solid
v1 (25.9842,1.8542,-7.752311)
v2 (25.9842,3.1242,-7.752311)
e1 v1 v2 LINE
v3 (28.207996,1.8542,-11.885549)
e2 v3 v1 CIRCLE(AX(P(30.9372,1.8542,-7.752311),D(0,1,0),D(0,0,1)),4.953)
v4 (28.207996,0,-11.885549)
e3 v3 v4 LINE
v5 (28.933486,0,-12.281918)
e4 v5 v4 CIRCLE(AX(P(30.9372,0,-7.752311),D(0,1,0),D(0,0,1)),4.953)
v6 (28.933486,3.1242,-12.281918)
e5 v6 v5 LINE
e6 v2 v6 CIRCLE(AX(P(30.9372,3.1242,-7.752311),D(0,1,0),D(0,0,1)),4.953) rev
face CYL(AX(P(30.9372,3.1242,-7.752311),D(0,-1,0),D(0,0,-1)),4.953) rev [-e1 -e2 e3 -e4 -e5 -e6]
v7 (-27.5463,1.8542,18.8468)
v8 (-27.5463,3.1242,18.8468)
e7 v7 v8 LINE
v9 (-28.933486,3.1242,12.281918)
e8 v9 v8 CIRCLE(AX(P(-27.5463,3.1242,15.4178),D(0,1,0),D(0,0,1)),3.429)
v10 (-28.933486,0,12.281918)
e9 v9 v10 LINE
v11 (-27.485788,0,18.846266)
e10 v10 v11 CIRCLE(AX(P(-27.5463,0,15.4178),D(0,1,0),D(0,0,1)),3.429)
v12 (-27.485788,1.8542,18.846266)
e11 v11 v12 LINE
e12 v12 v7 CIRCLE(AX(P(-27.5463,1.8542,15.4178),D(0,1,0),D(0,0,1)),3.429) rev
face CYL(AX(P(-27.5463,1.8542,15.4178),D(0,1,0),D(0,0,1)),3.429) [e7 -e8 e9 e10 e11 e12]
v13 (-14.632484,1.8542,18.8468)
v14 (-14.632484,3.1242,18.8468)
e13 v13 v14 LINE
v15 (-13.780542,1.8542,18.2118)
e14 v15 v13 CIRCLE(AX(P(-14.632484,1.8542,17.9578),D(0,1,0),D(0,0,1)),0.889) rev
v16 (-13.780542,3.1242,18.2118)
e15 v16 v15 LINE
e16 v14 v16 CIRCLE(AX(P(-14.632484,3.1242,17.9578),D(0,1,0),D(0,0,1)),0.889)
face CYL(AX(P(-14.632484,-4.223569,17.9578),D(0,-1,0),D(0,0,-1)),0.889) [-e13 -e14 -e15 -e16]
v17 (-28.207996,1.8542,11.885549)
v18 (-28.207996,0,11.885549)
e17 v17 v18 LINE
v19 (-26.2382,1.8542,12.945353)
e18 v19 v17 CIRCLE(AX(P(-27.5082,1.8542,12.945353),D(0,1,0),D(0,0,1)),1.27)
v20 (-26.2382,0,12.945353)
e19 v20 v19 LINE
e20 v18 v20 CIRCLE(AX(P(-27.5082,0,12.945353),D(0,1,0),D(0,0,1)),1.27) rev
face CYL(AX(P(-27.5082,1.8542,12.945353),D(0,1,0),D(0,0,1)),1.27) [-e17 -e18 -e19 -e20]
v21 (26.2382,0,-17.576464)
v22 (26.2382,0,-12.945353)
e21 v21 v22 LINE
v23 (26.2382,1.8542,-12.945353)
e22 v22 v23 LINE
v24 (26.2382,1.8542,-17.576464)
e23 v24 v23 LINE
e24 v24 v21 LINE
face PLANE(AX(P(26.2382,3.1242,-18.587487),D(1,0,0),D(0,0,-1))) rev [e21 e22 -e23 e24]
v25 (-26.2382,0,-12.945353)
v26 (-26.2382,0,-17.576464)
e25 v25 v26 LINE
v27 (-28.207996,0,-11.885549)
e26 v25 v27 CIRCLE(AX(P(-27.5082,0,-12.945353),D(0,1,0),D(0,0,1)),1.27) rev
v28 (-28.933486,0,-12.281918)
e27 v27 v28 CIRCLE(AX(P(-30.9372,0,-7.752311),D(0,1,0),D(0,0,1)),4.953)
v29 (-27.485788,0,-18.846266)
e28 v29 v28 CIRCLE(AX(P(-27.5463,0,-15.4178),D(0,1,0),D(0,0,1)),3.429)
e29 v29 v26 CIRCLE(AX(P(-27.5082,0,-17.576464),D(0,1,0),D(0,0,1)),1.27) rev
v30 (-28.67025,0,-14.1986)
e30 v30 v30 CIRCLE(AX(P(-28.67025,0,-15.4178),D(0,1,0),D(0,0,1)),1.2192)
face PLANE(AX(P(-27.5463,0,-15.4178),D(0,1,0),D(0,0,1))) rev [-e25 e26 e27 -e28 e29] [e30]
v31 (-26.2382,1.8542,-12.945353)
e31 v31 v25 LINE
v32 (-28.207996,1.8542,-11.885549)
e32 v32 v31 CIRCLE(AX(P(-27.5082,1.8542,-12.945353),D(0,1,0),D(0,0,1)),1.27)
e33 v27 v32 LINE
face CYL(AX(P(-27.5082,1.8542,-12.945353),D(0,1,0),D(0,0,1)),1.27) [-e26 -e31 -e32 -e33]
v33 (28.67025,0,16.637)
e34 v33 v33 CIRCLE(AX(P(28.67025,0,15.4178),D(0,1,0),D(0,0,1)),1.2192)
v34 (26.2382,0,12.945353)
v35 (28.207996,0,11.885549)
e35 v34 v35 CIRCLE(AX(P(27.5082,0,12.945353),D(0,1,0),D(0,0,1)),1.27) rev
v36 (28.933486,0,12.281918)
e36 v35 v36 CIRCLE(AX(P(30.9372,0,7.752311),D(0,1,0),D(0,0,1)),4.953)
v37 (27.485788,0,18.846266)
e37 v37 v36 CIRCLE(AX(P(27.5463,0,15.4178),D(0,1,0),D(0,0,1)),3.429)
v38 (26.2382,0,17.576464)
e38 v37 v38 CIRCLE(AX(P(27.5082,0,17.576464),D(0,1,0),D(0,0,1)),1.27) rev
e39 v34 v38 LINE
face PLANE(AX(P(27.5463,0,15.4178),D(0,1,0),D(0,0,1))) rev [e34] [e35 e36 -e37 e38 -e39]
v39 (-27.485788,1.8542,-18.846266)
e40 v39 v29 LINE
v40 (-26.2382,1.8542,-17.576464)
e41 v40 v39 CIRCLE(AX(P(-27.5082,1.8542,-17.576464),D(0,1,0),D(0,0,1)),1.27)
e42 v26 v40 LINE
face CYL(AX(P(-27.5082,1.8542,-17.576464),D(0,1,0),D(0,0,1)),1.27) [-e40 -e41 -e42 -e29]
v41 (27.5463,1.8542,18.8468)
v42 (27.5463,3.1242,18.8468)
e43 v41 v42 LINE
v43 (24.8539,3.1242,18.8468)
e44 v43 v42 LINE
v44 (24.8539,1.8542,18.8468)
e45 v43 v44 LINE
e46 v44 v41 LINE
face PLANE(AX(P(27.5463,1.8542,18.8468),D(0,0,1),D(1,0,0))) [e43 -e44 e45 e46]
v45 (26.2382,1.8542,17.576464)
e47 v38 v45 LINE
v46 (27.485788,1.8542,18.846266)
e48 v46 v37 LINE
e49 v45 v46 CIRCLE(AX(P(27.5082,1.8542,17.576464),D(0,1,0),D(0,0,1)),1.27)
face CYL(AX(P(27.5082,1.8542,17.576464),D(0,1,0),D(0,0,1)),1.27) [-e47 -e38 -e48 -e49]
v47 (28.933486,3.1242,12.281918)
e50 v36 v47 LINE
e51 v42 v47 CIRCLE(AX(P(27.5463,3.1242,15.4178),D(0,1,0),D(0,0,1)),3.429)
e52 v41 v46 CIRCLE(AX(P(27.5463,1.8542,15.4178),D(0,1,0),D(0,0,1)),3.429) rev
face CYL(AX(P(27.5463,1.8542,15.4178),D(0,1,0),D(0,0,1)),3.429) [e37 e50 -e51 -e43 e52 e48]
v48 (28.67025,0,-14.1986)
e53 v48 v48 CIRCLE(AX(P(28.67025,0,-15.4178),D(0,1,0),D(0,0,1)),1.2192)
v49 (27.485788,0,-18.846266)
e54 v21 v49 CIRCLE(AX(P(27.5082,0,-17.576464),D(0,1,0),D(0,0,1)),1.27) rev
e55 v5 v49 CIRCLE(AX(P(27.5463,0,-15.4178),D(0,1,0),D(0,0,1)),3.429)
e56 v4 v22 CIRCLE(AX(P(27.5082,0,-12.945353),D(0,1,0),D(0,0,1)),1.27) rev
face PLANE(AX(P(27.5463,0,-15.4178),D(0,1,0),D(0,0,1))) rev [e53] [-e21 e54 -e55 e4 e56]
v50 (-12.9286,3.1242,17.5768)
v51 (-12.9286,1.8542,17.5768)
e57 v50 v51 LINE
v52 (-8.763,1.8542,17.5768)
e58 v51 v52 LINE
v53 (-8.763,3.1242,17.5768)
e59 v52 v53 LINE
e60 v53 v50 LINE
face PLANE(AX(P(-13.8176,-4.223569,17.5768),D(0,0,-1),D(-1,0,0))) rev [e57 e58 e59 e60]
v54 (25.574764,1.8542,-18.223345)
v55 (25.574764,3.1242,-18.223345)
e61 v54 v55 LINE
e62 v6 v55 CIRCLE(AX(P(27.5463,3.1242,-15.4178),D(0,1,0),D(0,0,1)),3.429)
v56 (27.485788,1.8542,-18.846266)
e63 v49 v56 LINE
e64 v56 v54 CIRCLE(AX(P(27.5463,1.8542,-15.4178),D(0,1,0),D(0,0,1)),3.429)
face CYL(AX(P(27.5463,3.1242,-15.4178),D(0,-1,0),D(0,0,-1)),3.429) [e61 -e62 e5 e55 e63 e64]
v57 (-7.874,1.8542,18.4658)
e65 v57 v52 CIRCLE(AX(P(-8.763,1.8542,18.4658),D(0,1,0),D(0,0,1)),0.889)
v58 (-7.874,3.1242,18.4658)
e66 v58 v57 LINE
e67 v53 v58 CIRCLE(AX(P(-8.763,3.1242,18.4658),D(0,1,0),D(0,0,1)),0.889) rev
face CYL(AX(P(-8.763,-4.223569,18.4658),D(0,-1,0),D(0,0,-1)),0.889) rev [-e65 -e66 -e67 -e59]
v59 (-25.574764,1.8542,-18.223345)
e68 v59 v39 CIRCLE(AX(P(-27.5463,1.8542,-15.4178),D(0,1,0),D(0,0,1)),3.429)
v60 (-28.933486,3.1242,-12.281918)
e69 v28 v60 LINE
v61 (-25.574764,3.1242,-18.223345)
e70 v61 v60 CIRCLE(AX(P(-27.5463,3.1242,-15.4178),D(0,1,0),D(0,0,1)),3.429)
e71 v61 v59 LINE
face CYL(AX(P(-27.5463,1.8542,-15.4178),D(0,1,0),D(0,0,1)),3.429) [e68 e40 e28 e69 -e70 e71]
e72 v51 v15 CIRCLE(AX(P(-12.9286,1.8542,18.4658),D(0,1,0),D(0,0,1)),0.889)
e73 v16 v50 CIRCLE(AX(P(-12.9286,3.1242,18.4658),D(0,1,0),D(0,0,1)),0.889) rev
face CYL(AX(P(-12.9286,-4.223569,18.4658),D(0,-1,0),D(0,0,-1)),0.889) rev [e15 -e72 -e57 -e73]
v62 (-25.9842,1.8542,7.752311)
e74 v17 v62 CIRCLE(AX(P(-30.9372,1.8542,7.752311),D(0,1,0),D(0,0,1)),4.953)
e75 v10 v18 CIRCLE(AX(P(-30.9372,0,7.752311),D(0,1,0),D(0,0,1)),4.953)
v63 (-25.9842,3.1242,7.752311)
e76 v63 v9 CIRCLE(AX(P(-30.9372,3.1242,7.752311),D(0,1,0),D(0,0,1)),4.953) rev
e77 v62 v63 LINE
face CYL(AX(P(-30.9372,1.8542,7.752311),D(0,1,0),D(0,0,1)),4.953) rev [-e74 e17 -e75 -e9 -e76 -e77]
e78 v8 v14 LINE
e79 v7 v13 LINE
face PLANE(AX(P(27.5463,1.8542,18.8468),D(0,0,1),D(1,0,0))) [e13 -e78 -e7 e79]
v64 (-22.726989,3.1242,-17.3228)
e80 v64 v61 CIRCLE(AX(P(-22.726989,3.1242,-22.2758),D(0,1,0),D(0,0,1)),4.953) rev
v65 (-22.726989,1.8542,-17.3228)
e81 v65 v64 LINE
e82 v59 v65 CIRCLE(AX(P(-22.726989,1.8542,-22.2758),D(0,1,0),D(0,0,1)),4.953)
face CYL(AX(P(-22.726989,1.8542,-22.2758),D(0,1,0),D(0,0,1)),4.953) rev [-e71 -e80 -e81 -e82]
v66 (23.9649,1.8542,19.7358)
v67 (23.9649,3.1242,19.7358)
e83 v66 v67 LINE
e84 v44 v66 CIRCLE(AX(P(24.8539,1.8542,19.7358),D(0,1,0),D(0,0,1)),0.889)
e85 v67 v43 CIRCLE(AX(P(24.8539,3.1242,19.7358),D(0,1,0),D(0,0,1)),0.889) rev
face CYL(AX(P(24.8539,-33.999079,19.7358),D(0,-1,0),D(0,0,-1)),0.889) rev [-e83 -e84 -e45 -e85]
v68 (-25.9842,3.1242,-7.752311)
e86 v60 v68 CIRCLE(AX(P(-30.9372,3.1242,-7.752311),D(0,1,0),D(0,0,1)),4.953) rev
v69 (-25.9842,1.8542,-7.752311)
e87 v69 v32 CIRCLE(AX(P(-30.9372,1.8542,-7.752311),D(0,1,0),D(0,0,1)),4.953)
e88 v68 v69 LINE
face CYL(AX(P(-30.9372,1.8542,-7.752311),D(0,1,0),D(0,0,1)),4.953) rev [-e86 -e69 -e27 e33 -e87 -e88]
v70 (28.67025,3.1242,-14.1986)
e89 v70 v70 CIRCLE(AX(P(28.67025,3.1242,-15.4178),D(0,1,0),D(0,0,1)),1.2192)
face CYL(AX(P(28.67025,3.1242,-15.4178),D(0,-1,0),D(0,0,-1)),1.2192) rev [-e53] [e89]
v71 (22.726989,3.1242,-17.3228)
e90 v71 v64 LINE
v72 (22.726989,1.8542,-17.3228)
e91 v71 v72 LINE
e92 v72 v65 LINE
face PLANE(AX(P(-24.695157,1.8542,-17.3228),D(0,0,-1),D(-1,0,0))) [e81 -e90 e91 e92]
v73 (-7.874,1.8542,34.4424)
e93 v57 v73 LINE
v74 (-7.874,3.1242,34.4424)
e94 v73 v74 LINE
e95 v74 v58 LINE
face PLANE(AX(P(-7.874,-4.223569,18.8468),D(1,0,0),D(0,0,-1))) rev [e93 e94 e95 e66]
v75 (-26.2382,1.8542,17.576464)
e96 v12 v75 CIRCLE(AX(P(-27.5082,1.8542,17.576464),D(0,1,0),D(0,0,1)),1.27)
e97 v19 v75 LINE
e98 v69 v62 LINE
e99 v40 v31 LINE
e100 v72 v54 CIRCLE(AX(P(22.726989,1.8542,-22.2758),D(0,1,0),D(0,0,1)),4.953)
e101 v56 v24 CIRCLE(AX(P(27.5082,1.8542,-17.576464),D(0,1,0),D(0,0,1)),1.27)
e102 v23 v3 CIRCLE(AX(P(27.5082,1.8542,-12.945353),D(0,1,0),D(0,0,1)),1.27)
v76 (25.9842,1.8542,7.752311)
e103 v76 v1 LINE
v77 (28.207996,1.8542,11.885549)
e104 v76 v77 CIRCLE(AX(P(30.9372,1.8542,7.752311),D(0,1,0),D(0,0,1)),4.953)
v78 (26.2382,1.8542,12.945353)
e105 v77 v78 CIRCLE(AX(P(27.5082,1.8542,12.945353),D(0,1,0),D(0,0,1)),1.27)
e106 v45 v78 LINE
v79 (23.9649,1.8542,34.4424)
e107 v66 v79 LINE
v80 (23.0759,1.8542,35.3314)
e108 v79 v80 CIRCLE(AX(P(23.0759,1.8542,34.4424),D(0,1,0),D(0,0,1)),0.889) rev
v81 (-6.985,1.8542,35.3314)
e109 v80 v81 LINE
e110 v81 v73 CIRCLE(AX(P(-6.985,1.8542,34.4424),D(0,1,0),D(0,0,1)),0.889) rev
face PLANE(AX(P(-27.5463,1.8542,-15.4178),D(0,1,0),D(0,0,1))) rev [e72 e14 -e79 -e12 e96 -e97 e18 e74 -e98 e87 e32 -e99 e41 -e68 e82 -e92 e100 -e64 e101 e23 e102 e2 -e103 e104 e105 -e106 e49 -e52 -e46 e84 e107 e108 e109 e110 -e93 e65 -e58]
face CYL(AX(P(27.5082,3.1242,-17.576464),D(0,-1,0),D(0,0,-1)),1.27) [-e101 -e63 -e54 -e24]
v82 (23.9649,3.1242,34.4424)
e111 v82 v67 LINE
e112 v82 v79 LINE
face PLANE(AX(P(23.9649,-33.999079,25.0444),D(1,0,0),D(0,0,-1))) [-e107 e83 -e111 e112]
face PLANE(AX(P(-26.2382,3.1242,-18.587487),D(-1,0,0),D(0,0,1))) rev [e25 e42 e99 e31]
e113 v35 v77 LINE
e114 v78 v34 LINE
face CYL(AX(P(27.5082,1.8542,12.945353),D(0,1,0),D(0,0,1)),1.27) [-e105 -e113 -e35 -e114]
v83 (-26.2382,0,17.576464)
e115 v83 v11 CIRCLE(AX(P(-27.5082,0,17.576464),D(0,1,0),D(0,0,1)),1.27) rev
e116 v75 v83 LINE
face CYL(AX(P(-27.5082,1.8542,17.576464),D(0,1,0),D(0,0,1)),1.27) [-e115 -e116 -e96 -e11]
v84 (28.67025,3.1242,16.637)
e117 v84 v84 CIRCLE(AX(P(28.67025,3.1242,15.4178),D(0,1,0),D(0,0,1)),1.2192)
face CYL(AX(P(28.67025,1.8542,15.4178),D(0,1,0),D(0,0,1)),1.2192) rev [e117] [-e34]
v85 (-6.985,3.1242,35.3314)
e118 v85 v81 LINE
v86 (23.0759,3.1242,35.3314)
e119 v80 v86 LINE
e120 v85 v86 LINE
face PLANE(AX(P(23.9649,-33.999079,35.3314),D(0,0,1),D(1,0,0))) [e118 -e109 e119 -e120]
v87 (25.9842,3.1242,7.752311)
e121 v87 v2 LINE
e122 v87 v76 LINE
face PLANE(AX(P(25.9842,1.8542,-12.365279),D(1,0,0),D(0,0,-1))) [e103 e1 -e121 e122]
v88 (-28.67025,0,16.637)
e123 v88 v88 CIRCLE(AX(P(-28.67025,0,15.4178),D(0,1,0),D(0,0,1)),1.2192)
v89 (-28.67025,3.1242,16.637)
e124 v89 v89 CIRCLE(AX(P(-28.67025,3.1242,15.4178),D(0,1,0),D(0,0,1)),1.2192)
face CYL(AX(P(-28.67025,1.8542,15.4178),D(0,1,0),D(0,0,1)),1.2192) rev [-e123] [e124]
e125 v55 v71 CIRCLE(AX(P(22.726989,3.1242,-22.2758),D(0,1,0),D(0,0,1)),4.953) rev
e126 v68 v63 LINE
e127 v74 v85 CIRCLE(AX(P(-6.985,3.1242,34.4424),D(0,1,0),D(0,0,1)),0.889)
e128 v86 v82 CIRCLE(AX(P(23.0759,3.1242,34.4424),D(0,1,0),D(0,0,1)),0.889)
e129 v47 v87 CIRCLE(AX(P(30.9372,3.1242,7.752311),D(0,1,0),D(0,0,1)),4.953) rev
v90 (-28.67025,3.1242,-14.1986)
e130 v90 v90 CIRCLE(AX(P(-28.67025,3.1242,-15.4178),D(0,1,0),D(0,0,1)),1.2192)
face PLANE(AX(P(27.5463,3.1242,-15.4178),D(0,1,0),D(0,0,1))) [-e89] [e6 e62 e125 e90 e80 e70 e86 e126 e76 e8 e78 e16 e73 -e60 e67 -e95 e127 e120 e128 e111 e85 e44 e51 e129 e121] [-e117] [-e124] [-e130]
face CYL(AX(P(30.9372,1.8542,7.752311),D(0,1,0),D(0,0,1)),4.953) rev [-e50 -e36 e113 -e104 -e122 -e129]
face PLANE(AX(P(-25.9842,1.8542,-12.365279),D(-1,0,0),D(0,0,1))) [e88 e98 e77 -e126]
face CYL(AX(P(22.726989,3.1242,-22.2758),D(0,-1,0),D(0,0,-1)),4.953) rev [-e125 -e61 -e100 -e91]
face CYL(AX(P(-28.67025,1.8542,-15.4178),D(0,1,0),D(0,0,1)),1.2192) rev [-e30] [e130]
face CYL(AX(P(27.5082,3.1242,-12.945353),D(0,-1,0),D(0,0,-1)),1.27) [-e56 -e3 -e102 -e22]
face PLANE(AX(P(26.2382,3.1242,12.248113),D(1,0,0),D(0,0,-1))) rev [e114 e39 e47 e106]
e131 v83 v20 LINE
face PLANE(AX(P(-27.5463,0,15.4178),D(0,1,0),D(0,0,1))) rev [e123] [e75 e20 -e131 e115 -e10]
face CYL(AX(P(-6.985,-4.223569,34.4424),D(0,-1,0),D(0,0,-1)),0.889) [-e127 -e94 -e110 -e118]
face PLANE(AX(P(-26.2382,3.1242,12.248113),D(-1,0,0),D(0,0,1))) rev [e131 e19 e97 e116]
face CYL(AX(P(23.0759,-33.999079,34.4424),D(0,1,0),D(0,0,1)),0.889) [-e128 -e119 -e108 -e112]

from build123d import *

# Parameters (mm, degrees)
SKETCH1_R             = 1.2192
BOSS_EXTRUDE1_DEPTH   = 3.1242
BOSS_EXTRUDE1_2_DEPTH = 3.1242
BOSS_EXTRUDE1_3_DEPTH = 3.1242
BOSS_EXTRUDE1_4_DEPTH = 3.1242
BOSS_EXTRUDE2_START   = -1.27
SKETCH2_R             = 1.2192
BOSS_EXTRUDE2_DEPTH   = 1.27
SKETCH4_W             = 5.9436
SKETCH4_H             = 1.27
CUT_EXTRUDE1_DEPTH    = 1.27
FILLET1_DEPTH         = 3.1242
FILLET1_START         = 1.8542
FILLET1_2_DEPTH       = 1.27
BOSS_EXTRUDE3_DEPTH   = 1.27
FILLET2_R             = 0.889
FILLET3_R             = 0.889
FILLET5_R             = 1.27


with BuildPart() as part:
    # Sketch1 → Boss-Extrude1 (new body)
    with BuildSketch(Plane(origin=(0, 0, 0), x_dir=(1, 0, 0), z_dir=(0, 1, 0))):
        with BuildLine():
            Line((26.2382, 18.587486955), (26.2382, 12.248113045))
            ThreePointArc((26.2382, 12.248113045), (30.9753, 15.4178), (26.2382, 18.587486955))
        make_face()
        with Locations(Location((28.67025, 15.4178, 0), (0, 0, 270))):
            Circle(SKETCH1_R, mode=Mode.SUBTRACT)
    extrude(amount=BOSS_EXTRUDE1_DEPTH)



with BuildPart() as body_2:
    # Sketch1 → Boss-Extrude1 2 (new body)
    with BuildSketch(Plane(origin=(0, 0, 0), x_dir=(1, 0, 0), z_dir=(0, 1, 0))):
        with BuildLine():
            Line((-26.2382, 18.587486955), (-26.2382, 12.248113045))
            ThreePointArc((-26.2382, 12.248113045), (-30.9753, 15.4178), (-26.2382, 18.587486955))
        make_face()
        with Locations(Location((-28.67025, 15.4178, 0), (0, 0, 270))):
            Circle(SKETCH1_R, mode=Mode.SUBTRACT)
    extrude(amount=BOSS_EXTRUDE1_2_DEPTH)


with BuildPart() as body_3:
    # Sketch1 → Boss-Extrude1 3 (new body)
    with BuildSketch(Plane(origin=(0, 0, 0), x_dir=(1, 0, 0), z_dir=(0, 1, 0))):
        with BuildLine():
            Line((26.2382, -12.248113045), (26.2382, -18.587486955))
            ThreePointArc((26.2382, -18.587486955), (30.9753, -15.4178), (26.2382, -12.248113045))
        make_face()
        with Locations(Location((28.67025, -15.4178, 0), (0, 0, 270))):
            Circle(SKETCH1_R, mode=Mode.SUBTRACT)
    extrude(amount=BOSS_EXTRUDE1_3_DEPTH)


with BuildPart() as body_4:
    # Sketch1 → Boss-Extrude1 4 (new body)
    with BuildSketch(Plane(origin=(0, 0, 0), x_dir=(1, 0, 0), z_dir=(0, 1, 0))):
        with BuildLine():
            Line((-26.2382, -12.248113045), (-26.2382, -18.587486955))
            ThreePointArc((-26.2382, -18.587486955), (-30.9753, -15.4178), (-26.2382, -12.248113045))
        make_face()
        with Locations(Location((-28.67025, -15.4178, 0), (0, 0, 270))):
            Circle(SKETCH1_R, mode=Mode.SUBTRACT)
    extrude(amount=BOSS_EXTRUDE1_4_DEPTH)


with BuildPart() as part_1:
    add(part.part)

    add(body_2.part)  # Boss-Extrude2 merges body 2

    add(body_3.part)  # Boss-Extrude2 merges body 3

    add(body_4.part)  # Boss-Extrude2 merges body 4
    # Sketch2 → Boss-Extrude2 (add)
    with BuildSketch(Plane(origin=(0, 3.1242, 0), x_dir=(1, 0, 0), z_dir=(0, 1, 0)).offset(BOSS_EXTRUDE2_START)):
        with BuildLine():
            Line((-24.695157071, 17.3228), (24.695157071, 17.3228))
            ThreePointArc((24.695157071, 17.3228), (30.864949116, 16.280707319), (25.9842, 12.365278978))
            Line((25.9842, 12.365278978), (25.9842, -12.365278978))
            ThreePointArc((25.9842, -12.365278978), (30.879851828, -14.614386528), (27.5463, -18.8468))
            Line((27.5463, -18.8468), (-27.5463, -18.8468))
            ThreePointArc((-27.5463, -18.8468), (-30.879851828, -14.614386528), (-25.9842, -12.365278978))
            Line((-25.9842, -12.365278978), (-25.9842, 12.365278978))
            ThreePointArc((-25.9842, 12.365278978), (-30.864949116, 16.280707319), (-24.695157071, 17.3228))
        make_face()
        with Locations(Location((28.67025, -15.4178, 0), (0, 0, 270))):
            Circle(SKETCH2_R, mode=Mode.SUBTRACT)
        with Locations(Location((28.67025, 15.4178, 0), (0, 0, 270))):
            Circle(SKETCH2_R, mode=Mode.SUBTRACT)
        with Locations(Location((-28.67025, 15.4178, 0), (0, 0, 270))):
            Circle(SKETCH2_R, mode=Mode.SUBTRACT)
        with Locations(Location((-28.67025, -15.4178, 0), (0, 0, 270))):
            Circle(SKETCH2_R, mode=Mode.SUBTRACT)
    extrude(amount=BOSS_EXTRUDE2_DEPTH)

    # Sketch4 → Cut-Extrude1 (cut)
    with BuildSketch(Plane(origin=(0, 3.1242, 0), x_dir=(1, 0, 0), z_dir=(0, 1, 0))):
        with Locations((-10.8458, -18.2118)):
            Rectangle(SKETCH4_W, SKETCH4_H)
    extrude(amount=-CUT_EXTRUDE1_DEPTH, mode=Mode.SUBTRACT)

    # Fillet1: read off the stored shape, not the designer's step
    # Fillet1 outline → Fillet1 (add)
    with BuildSketch(Plane(origin=(0, 0, 0), x_dir=(1, 0, 0), z_dir=(0, 1, 0))):
        with BuildLine():
            Line((26.2382, 12.248113045), (26.2382, 9.318072184))
            ThreePointArc((26.2382, 9.318072184), (27.272818982, 11.08465566), (28.933486364, 12.281918148))
            ThreePointArc((28.933486364, 12.281918148), (27.58930418, 11.989069675), (26.2382, 12.248113045))
        make_face()
        with BuildLine():
            ThreePointArc((28.933486364, -12.281918148), (27.272818982, -11.08465566), (26.2382, -9.318072184))
            Line((26.2382, -9.318072184), (26.2382, -12.248113045))
            ThreePointArc((26.2382, -12.248113045), (27.58930418, -11.989069675), (28.933486364, -12.281918148))
        make_face()
        with BuildLine():
            Line((-26.2382, 9.318072184), (-26.2382, 12.248113045))
            ThreePointArc((-26.2382, 12.248113045), (-27.58930418, 11.989069675), (-28.933486364, 12.281918148))
            ThreePointArc((-28.933486364, 12.281918148), (-27.272818982, 11.08465566), (-26.2382, 9.318072184))
        make_face()
        with BuildLine():
            Line((-26.2382, -12.248113045), (-26.2382, -9.318072184))
            ThreePointArc((-26.2382, -9.318072184), (-27.272818982, -11.08465566), (-28.933486364, -12.281918148))
            ThreePointArc((-28.933486364, -12.281918148), (-27.58930418, -11.989069675), (-26.2382, -12.248113045))
        make_face()
    extrude(amount=FILLET1_DEPTH)

    # Fillet1 2 outline → Fillet1 2 (add)
    with BuildSketch(Plane(origin=(0, 0, 0), x_dir=(1, 0, 0), z_dir=(0, 1, 0)).offset(FILLET1_START)):
        with BuildLine():
            ThreePointArc((25.9842, 7.752311027), (26.048112355, 8.545425773), (26.2382, 9.318072184))
            Line((26.2382, 9.318072184), (26.2382, 12.248113045))
            ThreePointArc((26.2382, 12.248113045), (26.110004775, 12.304104924), (25.9842, 12.365278978))
            Line((25.9842, 12.365278978), (25.9842, 7.752311027))
        make_face()
        with BuildLine():
            ThreePointArc((26.2382, -9.318072184), (26.048112355, -8.545425773), (25.9842, -7.752311027))
            Line((25.9842, -7.752311027), (25.9842, -12.365278978))
            ThreePointArc((25.9842, -12.365278978), (26.110004775, -12.304104924), (26.2382, -12.248113045))
            Line((26.2382, -12.248113045), (26.2382, -9.318072184))
        make_face()
        with BuildLine():
            Line((-25.9842, -12.365278978), (-25.9842, -7.752311027))
            ThreePointArc((-25.9842, -7.752311027), (-26.048112355, -8.545425773), (-26.2382, -9.318072184))
            Line((-26.2382, -9.318072184), (-26.2382, -12.248113045))
            ThreePointArc((-26.2382, -12.248113045), (-26.110004775, -12.304104924), (-25.9842, -12.365278978))
        make_face()
        with BuildLine():
            Line((-24.695157071, 17.3228), (-22.726988846, 17.3228))
            ThreePointArc((-22.726988846, 17.3228), (-24.220374536, 17.553299795), (-25.574763619, 18.223345455))
            ThreePointArc((-25.574763619, 18.223345455), (-25.093280542, 17.813783418), (-24.695157071, 17.3228))
        make_face()
        with BuildLine():
            ThreePointArc((24.695157071, 17.3228), (25.093280542, 17.813783418), (25.574763619, 18.223345455))
            ThreePointArc((25.574763619, 18.223345455), (24.220374536, 17.553299795), (22.726988846, 17.3228))
            Line((22.726988846, 17.3228), (24.695157071, 17.3228))
        make_face()
        with BuildLine():
            ThreePointArc((-25.9842, 12.365278978), (-26.110004775, 12.304104924), (-26.2382, 12.248113045))
            Line((-26.2382, 12.248113045), (-26.2382, 9.318072184))
            ThreePointArc((-26.2382, 9.318072184), (-26.048112355, 8.545425773), (-25.9842, 7.752311027))
            Line((-25.9842, 7.752311027), (-25.9842, 12.365278978))
        make_face()
    extrude(amount=FILLET1_2_DEPTH)

    # Sketch7 → Boss-Extrude3 (add)
    with BuildSketch(Plane(origin=(0, 3.1242, 0), x_dir=(1, 0, 0), z_dir=(0, 1, 0))):
        Polygon((-7.874, -25.0444), (-7.874, -35.3314), (23.9649, -35.3314), (23.9649, -25.0444), (23.9649, -18.8468), (-7.874, -18.8468), align=None)
    extrude(amount=-BOSS_EXTRUDE3_DEPTH)

    # Fillet2
    fillet2_edges = [part_1.edges().sort_by_distance(p)[0] for p in [
        (-13.8176, 2.4892, 17.5768),
        (-7.874, 2.4892, 17.5768),
        (23.9649, 2.4892, 18.8468),
    ]]
    fillet(fillet2_edges, radius=FILLET2_R)

    # Fillet3
    fillet3_edges = [part_1.edges().sort_by_distance(p)[0] for p in [
        (-13.8176, 2.4892, 18.8468),
        (23.9649, 2.4892, 35.3314),
        (-7.874, 2.4892, 35.3314),
    ]]
    fillet(fillet3_edges, radius=FILLET3_R)

    # Fillet5
    # the kernel refuses this fillet: 1.27 mm, written as the material it takes off along each edge
    with BuildSketch(Plane(origin=(26.2382, -9.068202779, -9.318072184), x_dir=(0, 0, -1), z_dir=(0, 1, 0)), Plane(origin=(-26.2382, -9.068202779, 9.318072184), x_dir=(0, 0, 1), z_dir=(0, 1, 0))) as fillet5_piece_1:
        with BuildLine():
            CenterArc((3.627281111, -1.27), FILLET5_R, 90, 123.437045448)
            ThreePointArc((2.567476567, -1.969795919), (1.449146976, -0.769300527), (0, 0))
            Line((0, 0), (3.627281111, 0))
        make_face()
    extrude(amount=10.922402779, mode=Mode.SUBTRACT)
    with BuildSketch(Plane(origin=(26.2382, -9.068202779, 9.318072184), x_dir=(0, 0, 1), z_dir=(0, 1, 0)), Plane(origin=(-26.2382, -9.068202779, -9.318072184), x_dir=(0, 0, -1), z_dir=(0, 1, 0))) as fillet5_piece_2:
        with BuildLine():
            CenterArc((3.627281111, 1.27), FILLET5_R, 146.562954552, 123.437045448)
            ThreePointArc((2.567476567, 1.969795919), (1.449146976, 0.769300527), (0, 0))
            Line((0, 0), (3.627281111, 0))
        make_face()
    extrude(amount=10.922402779, mode=Mode.SUBTRACT)
    with BuildSketch(Plane(origin=(26.2382, -3.185360081, -18.587486955), x_dir=(0, 0, 1), z_dir=(0, 1, 0))) as fillet5_piece_3:
        with BuildLine():
            CenterArc((1.011023157, 1.27), FILLET5_R, 181.011154478, 88.988845522)
            ThreePointArc((-0.258779077, 1.247588235), (-0.187845593, 0.61166896), (0, 0))
            Line((0, 0), (1.011023157, 0))
        make_face()
    extrude(amount=5.039560081, mode=Mode.SUBTRACT)
    with BuildSketch(Plane(origin=(-26.2382, -3.185360081, 18.587486955), x_dir=(-0.9791579315799205, 0, 0.20310033240773342), z_dir=(0, 1, 0))) as fillet5_piece_4:
        with BuildLine():
            CenterArc((1.038191434, -1.247888766), FILLET5_R, 79.292837609, 88.988845522)
            Line((-0.205339139, -0.989951343), (0, 0))
            ThreePointArc((0, 0), (0.637072016, 0.059700333), (1.274144032, 0))
        make_face()
    extrude(amount=5.039560081, mode=Mode.SUBTRACT)
    with BuildSketch(Plane(origin=(-26.2382, -3.185360081, -18.587486955), x_dir=(0, 0, 1), z_dir=(0, 1, 0))) as fillet5_piece_5:
        with BuildLine():
            CenterArc((1.011023157, -1.27), FILLET5_R, 90, 88.988845522)
            ThreePointArc((-0.258779077, -1.247588235), (-0.187845593, -0.61166896), (0, 0))
            Line((0, 0), (1.011023157, 0))
        make_face()
    extrude(amount=5.039560081, mode=Mode.SUBTRACT)
    with BuildSketch(Plane(origin=(26.2382, -3.185360081, 18.587486955), x_dir=(0.9791579315799218, 0, 0.2031003324077264), z_dir=(0, 1, 0))) as fillet5_piece_6:
        with BuildLine():
            CenterArc((1.038191434, 1.247888766), FILLET5_R, 191.718316869, 88.988845522)
            Line((-0.205339139, 0.989951343), (0, 0))
            ThreePointArc((0, 0), (0.637072016, -0.059700333), (1.274144032, 0))
        make_face()
    extrude(amount=5.039560081, mode=Mode.SUBTRACT)


solid = part_1.part
